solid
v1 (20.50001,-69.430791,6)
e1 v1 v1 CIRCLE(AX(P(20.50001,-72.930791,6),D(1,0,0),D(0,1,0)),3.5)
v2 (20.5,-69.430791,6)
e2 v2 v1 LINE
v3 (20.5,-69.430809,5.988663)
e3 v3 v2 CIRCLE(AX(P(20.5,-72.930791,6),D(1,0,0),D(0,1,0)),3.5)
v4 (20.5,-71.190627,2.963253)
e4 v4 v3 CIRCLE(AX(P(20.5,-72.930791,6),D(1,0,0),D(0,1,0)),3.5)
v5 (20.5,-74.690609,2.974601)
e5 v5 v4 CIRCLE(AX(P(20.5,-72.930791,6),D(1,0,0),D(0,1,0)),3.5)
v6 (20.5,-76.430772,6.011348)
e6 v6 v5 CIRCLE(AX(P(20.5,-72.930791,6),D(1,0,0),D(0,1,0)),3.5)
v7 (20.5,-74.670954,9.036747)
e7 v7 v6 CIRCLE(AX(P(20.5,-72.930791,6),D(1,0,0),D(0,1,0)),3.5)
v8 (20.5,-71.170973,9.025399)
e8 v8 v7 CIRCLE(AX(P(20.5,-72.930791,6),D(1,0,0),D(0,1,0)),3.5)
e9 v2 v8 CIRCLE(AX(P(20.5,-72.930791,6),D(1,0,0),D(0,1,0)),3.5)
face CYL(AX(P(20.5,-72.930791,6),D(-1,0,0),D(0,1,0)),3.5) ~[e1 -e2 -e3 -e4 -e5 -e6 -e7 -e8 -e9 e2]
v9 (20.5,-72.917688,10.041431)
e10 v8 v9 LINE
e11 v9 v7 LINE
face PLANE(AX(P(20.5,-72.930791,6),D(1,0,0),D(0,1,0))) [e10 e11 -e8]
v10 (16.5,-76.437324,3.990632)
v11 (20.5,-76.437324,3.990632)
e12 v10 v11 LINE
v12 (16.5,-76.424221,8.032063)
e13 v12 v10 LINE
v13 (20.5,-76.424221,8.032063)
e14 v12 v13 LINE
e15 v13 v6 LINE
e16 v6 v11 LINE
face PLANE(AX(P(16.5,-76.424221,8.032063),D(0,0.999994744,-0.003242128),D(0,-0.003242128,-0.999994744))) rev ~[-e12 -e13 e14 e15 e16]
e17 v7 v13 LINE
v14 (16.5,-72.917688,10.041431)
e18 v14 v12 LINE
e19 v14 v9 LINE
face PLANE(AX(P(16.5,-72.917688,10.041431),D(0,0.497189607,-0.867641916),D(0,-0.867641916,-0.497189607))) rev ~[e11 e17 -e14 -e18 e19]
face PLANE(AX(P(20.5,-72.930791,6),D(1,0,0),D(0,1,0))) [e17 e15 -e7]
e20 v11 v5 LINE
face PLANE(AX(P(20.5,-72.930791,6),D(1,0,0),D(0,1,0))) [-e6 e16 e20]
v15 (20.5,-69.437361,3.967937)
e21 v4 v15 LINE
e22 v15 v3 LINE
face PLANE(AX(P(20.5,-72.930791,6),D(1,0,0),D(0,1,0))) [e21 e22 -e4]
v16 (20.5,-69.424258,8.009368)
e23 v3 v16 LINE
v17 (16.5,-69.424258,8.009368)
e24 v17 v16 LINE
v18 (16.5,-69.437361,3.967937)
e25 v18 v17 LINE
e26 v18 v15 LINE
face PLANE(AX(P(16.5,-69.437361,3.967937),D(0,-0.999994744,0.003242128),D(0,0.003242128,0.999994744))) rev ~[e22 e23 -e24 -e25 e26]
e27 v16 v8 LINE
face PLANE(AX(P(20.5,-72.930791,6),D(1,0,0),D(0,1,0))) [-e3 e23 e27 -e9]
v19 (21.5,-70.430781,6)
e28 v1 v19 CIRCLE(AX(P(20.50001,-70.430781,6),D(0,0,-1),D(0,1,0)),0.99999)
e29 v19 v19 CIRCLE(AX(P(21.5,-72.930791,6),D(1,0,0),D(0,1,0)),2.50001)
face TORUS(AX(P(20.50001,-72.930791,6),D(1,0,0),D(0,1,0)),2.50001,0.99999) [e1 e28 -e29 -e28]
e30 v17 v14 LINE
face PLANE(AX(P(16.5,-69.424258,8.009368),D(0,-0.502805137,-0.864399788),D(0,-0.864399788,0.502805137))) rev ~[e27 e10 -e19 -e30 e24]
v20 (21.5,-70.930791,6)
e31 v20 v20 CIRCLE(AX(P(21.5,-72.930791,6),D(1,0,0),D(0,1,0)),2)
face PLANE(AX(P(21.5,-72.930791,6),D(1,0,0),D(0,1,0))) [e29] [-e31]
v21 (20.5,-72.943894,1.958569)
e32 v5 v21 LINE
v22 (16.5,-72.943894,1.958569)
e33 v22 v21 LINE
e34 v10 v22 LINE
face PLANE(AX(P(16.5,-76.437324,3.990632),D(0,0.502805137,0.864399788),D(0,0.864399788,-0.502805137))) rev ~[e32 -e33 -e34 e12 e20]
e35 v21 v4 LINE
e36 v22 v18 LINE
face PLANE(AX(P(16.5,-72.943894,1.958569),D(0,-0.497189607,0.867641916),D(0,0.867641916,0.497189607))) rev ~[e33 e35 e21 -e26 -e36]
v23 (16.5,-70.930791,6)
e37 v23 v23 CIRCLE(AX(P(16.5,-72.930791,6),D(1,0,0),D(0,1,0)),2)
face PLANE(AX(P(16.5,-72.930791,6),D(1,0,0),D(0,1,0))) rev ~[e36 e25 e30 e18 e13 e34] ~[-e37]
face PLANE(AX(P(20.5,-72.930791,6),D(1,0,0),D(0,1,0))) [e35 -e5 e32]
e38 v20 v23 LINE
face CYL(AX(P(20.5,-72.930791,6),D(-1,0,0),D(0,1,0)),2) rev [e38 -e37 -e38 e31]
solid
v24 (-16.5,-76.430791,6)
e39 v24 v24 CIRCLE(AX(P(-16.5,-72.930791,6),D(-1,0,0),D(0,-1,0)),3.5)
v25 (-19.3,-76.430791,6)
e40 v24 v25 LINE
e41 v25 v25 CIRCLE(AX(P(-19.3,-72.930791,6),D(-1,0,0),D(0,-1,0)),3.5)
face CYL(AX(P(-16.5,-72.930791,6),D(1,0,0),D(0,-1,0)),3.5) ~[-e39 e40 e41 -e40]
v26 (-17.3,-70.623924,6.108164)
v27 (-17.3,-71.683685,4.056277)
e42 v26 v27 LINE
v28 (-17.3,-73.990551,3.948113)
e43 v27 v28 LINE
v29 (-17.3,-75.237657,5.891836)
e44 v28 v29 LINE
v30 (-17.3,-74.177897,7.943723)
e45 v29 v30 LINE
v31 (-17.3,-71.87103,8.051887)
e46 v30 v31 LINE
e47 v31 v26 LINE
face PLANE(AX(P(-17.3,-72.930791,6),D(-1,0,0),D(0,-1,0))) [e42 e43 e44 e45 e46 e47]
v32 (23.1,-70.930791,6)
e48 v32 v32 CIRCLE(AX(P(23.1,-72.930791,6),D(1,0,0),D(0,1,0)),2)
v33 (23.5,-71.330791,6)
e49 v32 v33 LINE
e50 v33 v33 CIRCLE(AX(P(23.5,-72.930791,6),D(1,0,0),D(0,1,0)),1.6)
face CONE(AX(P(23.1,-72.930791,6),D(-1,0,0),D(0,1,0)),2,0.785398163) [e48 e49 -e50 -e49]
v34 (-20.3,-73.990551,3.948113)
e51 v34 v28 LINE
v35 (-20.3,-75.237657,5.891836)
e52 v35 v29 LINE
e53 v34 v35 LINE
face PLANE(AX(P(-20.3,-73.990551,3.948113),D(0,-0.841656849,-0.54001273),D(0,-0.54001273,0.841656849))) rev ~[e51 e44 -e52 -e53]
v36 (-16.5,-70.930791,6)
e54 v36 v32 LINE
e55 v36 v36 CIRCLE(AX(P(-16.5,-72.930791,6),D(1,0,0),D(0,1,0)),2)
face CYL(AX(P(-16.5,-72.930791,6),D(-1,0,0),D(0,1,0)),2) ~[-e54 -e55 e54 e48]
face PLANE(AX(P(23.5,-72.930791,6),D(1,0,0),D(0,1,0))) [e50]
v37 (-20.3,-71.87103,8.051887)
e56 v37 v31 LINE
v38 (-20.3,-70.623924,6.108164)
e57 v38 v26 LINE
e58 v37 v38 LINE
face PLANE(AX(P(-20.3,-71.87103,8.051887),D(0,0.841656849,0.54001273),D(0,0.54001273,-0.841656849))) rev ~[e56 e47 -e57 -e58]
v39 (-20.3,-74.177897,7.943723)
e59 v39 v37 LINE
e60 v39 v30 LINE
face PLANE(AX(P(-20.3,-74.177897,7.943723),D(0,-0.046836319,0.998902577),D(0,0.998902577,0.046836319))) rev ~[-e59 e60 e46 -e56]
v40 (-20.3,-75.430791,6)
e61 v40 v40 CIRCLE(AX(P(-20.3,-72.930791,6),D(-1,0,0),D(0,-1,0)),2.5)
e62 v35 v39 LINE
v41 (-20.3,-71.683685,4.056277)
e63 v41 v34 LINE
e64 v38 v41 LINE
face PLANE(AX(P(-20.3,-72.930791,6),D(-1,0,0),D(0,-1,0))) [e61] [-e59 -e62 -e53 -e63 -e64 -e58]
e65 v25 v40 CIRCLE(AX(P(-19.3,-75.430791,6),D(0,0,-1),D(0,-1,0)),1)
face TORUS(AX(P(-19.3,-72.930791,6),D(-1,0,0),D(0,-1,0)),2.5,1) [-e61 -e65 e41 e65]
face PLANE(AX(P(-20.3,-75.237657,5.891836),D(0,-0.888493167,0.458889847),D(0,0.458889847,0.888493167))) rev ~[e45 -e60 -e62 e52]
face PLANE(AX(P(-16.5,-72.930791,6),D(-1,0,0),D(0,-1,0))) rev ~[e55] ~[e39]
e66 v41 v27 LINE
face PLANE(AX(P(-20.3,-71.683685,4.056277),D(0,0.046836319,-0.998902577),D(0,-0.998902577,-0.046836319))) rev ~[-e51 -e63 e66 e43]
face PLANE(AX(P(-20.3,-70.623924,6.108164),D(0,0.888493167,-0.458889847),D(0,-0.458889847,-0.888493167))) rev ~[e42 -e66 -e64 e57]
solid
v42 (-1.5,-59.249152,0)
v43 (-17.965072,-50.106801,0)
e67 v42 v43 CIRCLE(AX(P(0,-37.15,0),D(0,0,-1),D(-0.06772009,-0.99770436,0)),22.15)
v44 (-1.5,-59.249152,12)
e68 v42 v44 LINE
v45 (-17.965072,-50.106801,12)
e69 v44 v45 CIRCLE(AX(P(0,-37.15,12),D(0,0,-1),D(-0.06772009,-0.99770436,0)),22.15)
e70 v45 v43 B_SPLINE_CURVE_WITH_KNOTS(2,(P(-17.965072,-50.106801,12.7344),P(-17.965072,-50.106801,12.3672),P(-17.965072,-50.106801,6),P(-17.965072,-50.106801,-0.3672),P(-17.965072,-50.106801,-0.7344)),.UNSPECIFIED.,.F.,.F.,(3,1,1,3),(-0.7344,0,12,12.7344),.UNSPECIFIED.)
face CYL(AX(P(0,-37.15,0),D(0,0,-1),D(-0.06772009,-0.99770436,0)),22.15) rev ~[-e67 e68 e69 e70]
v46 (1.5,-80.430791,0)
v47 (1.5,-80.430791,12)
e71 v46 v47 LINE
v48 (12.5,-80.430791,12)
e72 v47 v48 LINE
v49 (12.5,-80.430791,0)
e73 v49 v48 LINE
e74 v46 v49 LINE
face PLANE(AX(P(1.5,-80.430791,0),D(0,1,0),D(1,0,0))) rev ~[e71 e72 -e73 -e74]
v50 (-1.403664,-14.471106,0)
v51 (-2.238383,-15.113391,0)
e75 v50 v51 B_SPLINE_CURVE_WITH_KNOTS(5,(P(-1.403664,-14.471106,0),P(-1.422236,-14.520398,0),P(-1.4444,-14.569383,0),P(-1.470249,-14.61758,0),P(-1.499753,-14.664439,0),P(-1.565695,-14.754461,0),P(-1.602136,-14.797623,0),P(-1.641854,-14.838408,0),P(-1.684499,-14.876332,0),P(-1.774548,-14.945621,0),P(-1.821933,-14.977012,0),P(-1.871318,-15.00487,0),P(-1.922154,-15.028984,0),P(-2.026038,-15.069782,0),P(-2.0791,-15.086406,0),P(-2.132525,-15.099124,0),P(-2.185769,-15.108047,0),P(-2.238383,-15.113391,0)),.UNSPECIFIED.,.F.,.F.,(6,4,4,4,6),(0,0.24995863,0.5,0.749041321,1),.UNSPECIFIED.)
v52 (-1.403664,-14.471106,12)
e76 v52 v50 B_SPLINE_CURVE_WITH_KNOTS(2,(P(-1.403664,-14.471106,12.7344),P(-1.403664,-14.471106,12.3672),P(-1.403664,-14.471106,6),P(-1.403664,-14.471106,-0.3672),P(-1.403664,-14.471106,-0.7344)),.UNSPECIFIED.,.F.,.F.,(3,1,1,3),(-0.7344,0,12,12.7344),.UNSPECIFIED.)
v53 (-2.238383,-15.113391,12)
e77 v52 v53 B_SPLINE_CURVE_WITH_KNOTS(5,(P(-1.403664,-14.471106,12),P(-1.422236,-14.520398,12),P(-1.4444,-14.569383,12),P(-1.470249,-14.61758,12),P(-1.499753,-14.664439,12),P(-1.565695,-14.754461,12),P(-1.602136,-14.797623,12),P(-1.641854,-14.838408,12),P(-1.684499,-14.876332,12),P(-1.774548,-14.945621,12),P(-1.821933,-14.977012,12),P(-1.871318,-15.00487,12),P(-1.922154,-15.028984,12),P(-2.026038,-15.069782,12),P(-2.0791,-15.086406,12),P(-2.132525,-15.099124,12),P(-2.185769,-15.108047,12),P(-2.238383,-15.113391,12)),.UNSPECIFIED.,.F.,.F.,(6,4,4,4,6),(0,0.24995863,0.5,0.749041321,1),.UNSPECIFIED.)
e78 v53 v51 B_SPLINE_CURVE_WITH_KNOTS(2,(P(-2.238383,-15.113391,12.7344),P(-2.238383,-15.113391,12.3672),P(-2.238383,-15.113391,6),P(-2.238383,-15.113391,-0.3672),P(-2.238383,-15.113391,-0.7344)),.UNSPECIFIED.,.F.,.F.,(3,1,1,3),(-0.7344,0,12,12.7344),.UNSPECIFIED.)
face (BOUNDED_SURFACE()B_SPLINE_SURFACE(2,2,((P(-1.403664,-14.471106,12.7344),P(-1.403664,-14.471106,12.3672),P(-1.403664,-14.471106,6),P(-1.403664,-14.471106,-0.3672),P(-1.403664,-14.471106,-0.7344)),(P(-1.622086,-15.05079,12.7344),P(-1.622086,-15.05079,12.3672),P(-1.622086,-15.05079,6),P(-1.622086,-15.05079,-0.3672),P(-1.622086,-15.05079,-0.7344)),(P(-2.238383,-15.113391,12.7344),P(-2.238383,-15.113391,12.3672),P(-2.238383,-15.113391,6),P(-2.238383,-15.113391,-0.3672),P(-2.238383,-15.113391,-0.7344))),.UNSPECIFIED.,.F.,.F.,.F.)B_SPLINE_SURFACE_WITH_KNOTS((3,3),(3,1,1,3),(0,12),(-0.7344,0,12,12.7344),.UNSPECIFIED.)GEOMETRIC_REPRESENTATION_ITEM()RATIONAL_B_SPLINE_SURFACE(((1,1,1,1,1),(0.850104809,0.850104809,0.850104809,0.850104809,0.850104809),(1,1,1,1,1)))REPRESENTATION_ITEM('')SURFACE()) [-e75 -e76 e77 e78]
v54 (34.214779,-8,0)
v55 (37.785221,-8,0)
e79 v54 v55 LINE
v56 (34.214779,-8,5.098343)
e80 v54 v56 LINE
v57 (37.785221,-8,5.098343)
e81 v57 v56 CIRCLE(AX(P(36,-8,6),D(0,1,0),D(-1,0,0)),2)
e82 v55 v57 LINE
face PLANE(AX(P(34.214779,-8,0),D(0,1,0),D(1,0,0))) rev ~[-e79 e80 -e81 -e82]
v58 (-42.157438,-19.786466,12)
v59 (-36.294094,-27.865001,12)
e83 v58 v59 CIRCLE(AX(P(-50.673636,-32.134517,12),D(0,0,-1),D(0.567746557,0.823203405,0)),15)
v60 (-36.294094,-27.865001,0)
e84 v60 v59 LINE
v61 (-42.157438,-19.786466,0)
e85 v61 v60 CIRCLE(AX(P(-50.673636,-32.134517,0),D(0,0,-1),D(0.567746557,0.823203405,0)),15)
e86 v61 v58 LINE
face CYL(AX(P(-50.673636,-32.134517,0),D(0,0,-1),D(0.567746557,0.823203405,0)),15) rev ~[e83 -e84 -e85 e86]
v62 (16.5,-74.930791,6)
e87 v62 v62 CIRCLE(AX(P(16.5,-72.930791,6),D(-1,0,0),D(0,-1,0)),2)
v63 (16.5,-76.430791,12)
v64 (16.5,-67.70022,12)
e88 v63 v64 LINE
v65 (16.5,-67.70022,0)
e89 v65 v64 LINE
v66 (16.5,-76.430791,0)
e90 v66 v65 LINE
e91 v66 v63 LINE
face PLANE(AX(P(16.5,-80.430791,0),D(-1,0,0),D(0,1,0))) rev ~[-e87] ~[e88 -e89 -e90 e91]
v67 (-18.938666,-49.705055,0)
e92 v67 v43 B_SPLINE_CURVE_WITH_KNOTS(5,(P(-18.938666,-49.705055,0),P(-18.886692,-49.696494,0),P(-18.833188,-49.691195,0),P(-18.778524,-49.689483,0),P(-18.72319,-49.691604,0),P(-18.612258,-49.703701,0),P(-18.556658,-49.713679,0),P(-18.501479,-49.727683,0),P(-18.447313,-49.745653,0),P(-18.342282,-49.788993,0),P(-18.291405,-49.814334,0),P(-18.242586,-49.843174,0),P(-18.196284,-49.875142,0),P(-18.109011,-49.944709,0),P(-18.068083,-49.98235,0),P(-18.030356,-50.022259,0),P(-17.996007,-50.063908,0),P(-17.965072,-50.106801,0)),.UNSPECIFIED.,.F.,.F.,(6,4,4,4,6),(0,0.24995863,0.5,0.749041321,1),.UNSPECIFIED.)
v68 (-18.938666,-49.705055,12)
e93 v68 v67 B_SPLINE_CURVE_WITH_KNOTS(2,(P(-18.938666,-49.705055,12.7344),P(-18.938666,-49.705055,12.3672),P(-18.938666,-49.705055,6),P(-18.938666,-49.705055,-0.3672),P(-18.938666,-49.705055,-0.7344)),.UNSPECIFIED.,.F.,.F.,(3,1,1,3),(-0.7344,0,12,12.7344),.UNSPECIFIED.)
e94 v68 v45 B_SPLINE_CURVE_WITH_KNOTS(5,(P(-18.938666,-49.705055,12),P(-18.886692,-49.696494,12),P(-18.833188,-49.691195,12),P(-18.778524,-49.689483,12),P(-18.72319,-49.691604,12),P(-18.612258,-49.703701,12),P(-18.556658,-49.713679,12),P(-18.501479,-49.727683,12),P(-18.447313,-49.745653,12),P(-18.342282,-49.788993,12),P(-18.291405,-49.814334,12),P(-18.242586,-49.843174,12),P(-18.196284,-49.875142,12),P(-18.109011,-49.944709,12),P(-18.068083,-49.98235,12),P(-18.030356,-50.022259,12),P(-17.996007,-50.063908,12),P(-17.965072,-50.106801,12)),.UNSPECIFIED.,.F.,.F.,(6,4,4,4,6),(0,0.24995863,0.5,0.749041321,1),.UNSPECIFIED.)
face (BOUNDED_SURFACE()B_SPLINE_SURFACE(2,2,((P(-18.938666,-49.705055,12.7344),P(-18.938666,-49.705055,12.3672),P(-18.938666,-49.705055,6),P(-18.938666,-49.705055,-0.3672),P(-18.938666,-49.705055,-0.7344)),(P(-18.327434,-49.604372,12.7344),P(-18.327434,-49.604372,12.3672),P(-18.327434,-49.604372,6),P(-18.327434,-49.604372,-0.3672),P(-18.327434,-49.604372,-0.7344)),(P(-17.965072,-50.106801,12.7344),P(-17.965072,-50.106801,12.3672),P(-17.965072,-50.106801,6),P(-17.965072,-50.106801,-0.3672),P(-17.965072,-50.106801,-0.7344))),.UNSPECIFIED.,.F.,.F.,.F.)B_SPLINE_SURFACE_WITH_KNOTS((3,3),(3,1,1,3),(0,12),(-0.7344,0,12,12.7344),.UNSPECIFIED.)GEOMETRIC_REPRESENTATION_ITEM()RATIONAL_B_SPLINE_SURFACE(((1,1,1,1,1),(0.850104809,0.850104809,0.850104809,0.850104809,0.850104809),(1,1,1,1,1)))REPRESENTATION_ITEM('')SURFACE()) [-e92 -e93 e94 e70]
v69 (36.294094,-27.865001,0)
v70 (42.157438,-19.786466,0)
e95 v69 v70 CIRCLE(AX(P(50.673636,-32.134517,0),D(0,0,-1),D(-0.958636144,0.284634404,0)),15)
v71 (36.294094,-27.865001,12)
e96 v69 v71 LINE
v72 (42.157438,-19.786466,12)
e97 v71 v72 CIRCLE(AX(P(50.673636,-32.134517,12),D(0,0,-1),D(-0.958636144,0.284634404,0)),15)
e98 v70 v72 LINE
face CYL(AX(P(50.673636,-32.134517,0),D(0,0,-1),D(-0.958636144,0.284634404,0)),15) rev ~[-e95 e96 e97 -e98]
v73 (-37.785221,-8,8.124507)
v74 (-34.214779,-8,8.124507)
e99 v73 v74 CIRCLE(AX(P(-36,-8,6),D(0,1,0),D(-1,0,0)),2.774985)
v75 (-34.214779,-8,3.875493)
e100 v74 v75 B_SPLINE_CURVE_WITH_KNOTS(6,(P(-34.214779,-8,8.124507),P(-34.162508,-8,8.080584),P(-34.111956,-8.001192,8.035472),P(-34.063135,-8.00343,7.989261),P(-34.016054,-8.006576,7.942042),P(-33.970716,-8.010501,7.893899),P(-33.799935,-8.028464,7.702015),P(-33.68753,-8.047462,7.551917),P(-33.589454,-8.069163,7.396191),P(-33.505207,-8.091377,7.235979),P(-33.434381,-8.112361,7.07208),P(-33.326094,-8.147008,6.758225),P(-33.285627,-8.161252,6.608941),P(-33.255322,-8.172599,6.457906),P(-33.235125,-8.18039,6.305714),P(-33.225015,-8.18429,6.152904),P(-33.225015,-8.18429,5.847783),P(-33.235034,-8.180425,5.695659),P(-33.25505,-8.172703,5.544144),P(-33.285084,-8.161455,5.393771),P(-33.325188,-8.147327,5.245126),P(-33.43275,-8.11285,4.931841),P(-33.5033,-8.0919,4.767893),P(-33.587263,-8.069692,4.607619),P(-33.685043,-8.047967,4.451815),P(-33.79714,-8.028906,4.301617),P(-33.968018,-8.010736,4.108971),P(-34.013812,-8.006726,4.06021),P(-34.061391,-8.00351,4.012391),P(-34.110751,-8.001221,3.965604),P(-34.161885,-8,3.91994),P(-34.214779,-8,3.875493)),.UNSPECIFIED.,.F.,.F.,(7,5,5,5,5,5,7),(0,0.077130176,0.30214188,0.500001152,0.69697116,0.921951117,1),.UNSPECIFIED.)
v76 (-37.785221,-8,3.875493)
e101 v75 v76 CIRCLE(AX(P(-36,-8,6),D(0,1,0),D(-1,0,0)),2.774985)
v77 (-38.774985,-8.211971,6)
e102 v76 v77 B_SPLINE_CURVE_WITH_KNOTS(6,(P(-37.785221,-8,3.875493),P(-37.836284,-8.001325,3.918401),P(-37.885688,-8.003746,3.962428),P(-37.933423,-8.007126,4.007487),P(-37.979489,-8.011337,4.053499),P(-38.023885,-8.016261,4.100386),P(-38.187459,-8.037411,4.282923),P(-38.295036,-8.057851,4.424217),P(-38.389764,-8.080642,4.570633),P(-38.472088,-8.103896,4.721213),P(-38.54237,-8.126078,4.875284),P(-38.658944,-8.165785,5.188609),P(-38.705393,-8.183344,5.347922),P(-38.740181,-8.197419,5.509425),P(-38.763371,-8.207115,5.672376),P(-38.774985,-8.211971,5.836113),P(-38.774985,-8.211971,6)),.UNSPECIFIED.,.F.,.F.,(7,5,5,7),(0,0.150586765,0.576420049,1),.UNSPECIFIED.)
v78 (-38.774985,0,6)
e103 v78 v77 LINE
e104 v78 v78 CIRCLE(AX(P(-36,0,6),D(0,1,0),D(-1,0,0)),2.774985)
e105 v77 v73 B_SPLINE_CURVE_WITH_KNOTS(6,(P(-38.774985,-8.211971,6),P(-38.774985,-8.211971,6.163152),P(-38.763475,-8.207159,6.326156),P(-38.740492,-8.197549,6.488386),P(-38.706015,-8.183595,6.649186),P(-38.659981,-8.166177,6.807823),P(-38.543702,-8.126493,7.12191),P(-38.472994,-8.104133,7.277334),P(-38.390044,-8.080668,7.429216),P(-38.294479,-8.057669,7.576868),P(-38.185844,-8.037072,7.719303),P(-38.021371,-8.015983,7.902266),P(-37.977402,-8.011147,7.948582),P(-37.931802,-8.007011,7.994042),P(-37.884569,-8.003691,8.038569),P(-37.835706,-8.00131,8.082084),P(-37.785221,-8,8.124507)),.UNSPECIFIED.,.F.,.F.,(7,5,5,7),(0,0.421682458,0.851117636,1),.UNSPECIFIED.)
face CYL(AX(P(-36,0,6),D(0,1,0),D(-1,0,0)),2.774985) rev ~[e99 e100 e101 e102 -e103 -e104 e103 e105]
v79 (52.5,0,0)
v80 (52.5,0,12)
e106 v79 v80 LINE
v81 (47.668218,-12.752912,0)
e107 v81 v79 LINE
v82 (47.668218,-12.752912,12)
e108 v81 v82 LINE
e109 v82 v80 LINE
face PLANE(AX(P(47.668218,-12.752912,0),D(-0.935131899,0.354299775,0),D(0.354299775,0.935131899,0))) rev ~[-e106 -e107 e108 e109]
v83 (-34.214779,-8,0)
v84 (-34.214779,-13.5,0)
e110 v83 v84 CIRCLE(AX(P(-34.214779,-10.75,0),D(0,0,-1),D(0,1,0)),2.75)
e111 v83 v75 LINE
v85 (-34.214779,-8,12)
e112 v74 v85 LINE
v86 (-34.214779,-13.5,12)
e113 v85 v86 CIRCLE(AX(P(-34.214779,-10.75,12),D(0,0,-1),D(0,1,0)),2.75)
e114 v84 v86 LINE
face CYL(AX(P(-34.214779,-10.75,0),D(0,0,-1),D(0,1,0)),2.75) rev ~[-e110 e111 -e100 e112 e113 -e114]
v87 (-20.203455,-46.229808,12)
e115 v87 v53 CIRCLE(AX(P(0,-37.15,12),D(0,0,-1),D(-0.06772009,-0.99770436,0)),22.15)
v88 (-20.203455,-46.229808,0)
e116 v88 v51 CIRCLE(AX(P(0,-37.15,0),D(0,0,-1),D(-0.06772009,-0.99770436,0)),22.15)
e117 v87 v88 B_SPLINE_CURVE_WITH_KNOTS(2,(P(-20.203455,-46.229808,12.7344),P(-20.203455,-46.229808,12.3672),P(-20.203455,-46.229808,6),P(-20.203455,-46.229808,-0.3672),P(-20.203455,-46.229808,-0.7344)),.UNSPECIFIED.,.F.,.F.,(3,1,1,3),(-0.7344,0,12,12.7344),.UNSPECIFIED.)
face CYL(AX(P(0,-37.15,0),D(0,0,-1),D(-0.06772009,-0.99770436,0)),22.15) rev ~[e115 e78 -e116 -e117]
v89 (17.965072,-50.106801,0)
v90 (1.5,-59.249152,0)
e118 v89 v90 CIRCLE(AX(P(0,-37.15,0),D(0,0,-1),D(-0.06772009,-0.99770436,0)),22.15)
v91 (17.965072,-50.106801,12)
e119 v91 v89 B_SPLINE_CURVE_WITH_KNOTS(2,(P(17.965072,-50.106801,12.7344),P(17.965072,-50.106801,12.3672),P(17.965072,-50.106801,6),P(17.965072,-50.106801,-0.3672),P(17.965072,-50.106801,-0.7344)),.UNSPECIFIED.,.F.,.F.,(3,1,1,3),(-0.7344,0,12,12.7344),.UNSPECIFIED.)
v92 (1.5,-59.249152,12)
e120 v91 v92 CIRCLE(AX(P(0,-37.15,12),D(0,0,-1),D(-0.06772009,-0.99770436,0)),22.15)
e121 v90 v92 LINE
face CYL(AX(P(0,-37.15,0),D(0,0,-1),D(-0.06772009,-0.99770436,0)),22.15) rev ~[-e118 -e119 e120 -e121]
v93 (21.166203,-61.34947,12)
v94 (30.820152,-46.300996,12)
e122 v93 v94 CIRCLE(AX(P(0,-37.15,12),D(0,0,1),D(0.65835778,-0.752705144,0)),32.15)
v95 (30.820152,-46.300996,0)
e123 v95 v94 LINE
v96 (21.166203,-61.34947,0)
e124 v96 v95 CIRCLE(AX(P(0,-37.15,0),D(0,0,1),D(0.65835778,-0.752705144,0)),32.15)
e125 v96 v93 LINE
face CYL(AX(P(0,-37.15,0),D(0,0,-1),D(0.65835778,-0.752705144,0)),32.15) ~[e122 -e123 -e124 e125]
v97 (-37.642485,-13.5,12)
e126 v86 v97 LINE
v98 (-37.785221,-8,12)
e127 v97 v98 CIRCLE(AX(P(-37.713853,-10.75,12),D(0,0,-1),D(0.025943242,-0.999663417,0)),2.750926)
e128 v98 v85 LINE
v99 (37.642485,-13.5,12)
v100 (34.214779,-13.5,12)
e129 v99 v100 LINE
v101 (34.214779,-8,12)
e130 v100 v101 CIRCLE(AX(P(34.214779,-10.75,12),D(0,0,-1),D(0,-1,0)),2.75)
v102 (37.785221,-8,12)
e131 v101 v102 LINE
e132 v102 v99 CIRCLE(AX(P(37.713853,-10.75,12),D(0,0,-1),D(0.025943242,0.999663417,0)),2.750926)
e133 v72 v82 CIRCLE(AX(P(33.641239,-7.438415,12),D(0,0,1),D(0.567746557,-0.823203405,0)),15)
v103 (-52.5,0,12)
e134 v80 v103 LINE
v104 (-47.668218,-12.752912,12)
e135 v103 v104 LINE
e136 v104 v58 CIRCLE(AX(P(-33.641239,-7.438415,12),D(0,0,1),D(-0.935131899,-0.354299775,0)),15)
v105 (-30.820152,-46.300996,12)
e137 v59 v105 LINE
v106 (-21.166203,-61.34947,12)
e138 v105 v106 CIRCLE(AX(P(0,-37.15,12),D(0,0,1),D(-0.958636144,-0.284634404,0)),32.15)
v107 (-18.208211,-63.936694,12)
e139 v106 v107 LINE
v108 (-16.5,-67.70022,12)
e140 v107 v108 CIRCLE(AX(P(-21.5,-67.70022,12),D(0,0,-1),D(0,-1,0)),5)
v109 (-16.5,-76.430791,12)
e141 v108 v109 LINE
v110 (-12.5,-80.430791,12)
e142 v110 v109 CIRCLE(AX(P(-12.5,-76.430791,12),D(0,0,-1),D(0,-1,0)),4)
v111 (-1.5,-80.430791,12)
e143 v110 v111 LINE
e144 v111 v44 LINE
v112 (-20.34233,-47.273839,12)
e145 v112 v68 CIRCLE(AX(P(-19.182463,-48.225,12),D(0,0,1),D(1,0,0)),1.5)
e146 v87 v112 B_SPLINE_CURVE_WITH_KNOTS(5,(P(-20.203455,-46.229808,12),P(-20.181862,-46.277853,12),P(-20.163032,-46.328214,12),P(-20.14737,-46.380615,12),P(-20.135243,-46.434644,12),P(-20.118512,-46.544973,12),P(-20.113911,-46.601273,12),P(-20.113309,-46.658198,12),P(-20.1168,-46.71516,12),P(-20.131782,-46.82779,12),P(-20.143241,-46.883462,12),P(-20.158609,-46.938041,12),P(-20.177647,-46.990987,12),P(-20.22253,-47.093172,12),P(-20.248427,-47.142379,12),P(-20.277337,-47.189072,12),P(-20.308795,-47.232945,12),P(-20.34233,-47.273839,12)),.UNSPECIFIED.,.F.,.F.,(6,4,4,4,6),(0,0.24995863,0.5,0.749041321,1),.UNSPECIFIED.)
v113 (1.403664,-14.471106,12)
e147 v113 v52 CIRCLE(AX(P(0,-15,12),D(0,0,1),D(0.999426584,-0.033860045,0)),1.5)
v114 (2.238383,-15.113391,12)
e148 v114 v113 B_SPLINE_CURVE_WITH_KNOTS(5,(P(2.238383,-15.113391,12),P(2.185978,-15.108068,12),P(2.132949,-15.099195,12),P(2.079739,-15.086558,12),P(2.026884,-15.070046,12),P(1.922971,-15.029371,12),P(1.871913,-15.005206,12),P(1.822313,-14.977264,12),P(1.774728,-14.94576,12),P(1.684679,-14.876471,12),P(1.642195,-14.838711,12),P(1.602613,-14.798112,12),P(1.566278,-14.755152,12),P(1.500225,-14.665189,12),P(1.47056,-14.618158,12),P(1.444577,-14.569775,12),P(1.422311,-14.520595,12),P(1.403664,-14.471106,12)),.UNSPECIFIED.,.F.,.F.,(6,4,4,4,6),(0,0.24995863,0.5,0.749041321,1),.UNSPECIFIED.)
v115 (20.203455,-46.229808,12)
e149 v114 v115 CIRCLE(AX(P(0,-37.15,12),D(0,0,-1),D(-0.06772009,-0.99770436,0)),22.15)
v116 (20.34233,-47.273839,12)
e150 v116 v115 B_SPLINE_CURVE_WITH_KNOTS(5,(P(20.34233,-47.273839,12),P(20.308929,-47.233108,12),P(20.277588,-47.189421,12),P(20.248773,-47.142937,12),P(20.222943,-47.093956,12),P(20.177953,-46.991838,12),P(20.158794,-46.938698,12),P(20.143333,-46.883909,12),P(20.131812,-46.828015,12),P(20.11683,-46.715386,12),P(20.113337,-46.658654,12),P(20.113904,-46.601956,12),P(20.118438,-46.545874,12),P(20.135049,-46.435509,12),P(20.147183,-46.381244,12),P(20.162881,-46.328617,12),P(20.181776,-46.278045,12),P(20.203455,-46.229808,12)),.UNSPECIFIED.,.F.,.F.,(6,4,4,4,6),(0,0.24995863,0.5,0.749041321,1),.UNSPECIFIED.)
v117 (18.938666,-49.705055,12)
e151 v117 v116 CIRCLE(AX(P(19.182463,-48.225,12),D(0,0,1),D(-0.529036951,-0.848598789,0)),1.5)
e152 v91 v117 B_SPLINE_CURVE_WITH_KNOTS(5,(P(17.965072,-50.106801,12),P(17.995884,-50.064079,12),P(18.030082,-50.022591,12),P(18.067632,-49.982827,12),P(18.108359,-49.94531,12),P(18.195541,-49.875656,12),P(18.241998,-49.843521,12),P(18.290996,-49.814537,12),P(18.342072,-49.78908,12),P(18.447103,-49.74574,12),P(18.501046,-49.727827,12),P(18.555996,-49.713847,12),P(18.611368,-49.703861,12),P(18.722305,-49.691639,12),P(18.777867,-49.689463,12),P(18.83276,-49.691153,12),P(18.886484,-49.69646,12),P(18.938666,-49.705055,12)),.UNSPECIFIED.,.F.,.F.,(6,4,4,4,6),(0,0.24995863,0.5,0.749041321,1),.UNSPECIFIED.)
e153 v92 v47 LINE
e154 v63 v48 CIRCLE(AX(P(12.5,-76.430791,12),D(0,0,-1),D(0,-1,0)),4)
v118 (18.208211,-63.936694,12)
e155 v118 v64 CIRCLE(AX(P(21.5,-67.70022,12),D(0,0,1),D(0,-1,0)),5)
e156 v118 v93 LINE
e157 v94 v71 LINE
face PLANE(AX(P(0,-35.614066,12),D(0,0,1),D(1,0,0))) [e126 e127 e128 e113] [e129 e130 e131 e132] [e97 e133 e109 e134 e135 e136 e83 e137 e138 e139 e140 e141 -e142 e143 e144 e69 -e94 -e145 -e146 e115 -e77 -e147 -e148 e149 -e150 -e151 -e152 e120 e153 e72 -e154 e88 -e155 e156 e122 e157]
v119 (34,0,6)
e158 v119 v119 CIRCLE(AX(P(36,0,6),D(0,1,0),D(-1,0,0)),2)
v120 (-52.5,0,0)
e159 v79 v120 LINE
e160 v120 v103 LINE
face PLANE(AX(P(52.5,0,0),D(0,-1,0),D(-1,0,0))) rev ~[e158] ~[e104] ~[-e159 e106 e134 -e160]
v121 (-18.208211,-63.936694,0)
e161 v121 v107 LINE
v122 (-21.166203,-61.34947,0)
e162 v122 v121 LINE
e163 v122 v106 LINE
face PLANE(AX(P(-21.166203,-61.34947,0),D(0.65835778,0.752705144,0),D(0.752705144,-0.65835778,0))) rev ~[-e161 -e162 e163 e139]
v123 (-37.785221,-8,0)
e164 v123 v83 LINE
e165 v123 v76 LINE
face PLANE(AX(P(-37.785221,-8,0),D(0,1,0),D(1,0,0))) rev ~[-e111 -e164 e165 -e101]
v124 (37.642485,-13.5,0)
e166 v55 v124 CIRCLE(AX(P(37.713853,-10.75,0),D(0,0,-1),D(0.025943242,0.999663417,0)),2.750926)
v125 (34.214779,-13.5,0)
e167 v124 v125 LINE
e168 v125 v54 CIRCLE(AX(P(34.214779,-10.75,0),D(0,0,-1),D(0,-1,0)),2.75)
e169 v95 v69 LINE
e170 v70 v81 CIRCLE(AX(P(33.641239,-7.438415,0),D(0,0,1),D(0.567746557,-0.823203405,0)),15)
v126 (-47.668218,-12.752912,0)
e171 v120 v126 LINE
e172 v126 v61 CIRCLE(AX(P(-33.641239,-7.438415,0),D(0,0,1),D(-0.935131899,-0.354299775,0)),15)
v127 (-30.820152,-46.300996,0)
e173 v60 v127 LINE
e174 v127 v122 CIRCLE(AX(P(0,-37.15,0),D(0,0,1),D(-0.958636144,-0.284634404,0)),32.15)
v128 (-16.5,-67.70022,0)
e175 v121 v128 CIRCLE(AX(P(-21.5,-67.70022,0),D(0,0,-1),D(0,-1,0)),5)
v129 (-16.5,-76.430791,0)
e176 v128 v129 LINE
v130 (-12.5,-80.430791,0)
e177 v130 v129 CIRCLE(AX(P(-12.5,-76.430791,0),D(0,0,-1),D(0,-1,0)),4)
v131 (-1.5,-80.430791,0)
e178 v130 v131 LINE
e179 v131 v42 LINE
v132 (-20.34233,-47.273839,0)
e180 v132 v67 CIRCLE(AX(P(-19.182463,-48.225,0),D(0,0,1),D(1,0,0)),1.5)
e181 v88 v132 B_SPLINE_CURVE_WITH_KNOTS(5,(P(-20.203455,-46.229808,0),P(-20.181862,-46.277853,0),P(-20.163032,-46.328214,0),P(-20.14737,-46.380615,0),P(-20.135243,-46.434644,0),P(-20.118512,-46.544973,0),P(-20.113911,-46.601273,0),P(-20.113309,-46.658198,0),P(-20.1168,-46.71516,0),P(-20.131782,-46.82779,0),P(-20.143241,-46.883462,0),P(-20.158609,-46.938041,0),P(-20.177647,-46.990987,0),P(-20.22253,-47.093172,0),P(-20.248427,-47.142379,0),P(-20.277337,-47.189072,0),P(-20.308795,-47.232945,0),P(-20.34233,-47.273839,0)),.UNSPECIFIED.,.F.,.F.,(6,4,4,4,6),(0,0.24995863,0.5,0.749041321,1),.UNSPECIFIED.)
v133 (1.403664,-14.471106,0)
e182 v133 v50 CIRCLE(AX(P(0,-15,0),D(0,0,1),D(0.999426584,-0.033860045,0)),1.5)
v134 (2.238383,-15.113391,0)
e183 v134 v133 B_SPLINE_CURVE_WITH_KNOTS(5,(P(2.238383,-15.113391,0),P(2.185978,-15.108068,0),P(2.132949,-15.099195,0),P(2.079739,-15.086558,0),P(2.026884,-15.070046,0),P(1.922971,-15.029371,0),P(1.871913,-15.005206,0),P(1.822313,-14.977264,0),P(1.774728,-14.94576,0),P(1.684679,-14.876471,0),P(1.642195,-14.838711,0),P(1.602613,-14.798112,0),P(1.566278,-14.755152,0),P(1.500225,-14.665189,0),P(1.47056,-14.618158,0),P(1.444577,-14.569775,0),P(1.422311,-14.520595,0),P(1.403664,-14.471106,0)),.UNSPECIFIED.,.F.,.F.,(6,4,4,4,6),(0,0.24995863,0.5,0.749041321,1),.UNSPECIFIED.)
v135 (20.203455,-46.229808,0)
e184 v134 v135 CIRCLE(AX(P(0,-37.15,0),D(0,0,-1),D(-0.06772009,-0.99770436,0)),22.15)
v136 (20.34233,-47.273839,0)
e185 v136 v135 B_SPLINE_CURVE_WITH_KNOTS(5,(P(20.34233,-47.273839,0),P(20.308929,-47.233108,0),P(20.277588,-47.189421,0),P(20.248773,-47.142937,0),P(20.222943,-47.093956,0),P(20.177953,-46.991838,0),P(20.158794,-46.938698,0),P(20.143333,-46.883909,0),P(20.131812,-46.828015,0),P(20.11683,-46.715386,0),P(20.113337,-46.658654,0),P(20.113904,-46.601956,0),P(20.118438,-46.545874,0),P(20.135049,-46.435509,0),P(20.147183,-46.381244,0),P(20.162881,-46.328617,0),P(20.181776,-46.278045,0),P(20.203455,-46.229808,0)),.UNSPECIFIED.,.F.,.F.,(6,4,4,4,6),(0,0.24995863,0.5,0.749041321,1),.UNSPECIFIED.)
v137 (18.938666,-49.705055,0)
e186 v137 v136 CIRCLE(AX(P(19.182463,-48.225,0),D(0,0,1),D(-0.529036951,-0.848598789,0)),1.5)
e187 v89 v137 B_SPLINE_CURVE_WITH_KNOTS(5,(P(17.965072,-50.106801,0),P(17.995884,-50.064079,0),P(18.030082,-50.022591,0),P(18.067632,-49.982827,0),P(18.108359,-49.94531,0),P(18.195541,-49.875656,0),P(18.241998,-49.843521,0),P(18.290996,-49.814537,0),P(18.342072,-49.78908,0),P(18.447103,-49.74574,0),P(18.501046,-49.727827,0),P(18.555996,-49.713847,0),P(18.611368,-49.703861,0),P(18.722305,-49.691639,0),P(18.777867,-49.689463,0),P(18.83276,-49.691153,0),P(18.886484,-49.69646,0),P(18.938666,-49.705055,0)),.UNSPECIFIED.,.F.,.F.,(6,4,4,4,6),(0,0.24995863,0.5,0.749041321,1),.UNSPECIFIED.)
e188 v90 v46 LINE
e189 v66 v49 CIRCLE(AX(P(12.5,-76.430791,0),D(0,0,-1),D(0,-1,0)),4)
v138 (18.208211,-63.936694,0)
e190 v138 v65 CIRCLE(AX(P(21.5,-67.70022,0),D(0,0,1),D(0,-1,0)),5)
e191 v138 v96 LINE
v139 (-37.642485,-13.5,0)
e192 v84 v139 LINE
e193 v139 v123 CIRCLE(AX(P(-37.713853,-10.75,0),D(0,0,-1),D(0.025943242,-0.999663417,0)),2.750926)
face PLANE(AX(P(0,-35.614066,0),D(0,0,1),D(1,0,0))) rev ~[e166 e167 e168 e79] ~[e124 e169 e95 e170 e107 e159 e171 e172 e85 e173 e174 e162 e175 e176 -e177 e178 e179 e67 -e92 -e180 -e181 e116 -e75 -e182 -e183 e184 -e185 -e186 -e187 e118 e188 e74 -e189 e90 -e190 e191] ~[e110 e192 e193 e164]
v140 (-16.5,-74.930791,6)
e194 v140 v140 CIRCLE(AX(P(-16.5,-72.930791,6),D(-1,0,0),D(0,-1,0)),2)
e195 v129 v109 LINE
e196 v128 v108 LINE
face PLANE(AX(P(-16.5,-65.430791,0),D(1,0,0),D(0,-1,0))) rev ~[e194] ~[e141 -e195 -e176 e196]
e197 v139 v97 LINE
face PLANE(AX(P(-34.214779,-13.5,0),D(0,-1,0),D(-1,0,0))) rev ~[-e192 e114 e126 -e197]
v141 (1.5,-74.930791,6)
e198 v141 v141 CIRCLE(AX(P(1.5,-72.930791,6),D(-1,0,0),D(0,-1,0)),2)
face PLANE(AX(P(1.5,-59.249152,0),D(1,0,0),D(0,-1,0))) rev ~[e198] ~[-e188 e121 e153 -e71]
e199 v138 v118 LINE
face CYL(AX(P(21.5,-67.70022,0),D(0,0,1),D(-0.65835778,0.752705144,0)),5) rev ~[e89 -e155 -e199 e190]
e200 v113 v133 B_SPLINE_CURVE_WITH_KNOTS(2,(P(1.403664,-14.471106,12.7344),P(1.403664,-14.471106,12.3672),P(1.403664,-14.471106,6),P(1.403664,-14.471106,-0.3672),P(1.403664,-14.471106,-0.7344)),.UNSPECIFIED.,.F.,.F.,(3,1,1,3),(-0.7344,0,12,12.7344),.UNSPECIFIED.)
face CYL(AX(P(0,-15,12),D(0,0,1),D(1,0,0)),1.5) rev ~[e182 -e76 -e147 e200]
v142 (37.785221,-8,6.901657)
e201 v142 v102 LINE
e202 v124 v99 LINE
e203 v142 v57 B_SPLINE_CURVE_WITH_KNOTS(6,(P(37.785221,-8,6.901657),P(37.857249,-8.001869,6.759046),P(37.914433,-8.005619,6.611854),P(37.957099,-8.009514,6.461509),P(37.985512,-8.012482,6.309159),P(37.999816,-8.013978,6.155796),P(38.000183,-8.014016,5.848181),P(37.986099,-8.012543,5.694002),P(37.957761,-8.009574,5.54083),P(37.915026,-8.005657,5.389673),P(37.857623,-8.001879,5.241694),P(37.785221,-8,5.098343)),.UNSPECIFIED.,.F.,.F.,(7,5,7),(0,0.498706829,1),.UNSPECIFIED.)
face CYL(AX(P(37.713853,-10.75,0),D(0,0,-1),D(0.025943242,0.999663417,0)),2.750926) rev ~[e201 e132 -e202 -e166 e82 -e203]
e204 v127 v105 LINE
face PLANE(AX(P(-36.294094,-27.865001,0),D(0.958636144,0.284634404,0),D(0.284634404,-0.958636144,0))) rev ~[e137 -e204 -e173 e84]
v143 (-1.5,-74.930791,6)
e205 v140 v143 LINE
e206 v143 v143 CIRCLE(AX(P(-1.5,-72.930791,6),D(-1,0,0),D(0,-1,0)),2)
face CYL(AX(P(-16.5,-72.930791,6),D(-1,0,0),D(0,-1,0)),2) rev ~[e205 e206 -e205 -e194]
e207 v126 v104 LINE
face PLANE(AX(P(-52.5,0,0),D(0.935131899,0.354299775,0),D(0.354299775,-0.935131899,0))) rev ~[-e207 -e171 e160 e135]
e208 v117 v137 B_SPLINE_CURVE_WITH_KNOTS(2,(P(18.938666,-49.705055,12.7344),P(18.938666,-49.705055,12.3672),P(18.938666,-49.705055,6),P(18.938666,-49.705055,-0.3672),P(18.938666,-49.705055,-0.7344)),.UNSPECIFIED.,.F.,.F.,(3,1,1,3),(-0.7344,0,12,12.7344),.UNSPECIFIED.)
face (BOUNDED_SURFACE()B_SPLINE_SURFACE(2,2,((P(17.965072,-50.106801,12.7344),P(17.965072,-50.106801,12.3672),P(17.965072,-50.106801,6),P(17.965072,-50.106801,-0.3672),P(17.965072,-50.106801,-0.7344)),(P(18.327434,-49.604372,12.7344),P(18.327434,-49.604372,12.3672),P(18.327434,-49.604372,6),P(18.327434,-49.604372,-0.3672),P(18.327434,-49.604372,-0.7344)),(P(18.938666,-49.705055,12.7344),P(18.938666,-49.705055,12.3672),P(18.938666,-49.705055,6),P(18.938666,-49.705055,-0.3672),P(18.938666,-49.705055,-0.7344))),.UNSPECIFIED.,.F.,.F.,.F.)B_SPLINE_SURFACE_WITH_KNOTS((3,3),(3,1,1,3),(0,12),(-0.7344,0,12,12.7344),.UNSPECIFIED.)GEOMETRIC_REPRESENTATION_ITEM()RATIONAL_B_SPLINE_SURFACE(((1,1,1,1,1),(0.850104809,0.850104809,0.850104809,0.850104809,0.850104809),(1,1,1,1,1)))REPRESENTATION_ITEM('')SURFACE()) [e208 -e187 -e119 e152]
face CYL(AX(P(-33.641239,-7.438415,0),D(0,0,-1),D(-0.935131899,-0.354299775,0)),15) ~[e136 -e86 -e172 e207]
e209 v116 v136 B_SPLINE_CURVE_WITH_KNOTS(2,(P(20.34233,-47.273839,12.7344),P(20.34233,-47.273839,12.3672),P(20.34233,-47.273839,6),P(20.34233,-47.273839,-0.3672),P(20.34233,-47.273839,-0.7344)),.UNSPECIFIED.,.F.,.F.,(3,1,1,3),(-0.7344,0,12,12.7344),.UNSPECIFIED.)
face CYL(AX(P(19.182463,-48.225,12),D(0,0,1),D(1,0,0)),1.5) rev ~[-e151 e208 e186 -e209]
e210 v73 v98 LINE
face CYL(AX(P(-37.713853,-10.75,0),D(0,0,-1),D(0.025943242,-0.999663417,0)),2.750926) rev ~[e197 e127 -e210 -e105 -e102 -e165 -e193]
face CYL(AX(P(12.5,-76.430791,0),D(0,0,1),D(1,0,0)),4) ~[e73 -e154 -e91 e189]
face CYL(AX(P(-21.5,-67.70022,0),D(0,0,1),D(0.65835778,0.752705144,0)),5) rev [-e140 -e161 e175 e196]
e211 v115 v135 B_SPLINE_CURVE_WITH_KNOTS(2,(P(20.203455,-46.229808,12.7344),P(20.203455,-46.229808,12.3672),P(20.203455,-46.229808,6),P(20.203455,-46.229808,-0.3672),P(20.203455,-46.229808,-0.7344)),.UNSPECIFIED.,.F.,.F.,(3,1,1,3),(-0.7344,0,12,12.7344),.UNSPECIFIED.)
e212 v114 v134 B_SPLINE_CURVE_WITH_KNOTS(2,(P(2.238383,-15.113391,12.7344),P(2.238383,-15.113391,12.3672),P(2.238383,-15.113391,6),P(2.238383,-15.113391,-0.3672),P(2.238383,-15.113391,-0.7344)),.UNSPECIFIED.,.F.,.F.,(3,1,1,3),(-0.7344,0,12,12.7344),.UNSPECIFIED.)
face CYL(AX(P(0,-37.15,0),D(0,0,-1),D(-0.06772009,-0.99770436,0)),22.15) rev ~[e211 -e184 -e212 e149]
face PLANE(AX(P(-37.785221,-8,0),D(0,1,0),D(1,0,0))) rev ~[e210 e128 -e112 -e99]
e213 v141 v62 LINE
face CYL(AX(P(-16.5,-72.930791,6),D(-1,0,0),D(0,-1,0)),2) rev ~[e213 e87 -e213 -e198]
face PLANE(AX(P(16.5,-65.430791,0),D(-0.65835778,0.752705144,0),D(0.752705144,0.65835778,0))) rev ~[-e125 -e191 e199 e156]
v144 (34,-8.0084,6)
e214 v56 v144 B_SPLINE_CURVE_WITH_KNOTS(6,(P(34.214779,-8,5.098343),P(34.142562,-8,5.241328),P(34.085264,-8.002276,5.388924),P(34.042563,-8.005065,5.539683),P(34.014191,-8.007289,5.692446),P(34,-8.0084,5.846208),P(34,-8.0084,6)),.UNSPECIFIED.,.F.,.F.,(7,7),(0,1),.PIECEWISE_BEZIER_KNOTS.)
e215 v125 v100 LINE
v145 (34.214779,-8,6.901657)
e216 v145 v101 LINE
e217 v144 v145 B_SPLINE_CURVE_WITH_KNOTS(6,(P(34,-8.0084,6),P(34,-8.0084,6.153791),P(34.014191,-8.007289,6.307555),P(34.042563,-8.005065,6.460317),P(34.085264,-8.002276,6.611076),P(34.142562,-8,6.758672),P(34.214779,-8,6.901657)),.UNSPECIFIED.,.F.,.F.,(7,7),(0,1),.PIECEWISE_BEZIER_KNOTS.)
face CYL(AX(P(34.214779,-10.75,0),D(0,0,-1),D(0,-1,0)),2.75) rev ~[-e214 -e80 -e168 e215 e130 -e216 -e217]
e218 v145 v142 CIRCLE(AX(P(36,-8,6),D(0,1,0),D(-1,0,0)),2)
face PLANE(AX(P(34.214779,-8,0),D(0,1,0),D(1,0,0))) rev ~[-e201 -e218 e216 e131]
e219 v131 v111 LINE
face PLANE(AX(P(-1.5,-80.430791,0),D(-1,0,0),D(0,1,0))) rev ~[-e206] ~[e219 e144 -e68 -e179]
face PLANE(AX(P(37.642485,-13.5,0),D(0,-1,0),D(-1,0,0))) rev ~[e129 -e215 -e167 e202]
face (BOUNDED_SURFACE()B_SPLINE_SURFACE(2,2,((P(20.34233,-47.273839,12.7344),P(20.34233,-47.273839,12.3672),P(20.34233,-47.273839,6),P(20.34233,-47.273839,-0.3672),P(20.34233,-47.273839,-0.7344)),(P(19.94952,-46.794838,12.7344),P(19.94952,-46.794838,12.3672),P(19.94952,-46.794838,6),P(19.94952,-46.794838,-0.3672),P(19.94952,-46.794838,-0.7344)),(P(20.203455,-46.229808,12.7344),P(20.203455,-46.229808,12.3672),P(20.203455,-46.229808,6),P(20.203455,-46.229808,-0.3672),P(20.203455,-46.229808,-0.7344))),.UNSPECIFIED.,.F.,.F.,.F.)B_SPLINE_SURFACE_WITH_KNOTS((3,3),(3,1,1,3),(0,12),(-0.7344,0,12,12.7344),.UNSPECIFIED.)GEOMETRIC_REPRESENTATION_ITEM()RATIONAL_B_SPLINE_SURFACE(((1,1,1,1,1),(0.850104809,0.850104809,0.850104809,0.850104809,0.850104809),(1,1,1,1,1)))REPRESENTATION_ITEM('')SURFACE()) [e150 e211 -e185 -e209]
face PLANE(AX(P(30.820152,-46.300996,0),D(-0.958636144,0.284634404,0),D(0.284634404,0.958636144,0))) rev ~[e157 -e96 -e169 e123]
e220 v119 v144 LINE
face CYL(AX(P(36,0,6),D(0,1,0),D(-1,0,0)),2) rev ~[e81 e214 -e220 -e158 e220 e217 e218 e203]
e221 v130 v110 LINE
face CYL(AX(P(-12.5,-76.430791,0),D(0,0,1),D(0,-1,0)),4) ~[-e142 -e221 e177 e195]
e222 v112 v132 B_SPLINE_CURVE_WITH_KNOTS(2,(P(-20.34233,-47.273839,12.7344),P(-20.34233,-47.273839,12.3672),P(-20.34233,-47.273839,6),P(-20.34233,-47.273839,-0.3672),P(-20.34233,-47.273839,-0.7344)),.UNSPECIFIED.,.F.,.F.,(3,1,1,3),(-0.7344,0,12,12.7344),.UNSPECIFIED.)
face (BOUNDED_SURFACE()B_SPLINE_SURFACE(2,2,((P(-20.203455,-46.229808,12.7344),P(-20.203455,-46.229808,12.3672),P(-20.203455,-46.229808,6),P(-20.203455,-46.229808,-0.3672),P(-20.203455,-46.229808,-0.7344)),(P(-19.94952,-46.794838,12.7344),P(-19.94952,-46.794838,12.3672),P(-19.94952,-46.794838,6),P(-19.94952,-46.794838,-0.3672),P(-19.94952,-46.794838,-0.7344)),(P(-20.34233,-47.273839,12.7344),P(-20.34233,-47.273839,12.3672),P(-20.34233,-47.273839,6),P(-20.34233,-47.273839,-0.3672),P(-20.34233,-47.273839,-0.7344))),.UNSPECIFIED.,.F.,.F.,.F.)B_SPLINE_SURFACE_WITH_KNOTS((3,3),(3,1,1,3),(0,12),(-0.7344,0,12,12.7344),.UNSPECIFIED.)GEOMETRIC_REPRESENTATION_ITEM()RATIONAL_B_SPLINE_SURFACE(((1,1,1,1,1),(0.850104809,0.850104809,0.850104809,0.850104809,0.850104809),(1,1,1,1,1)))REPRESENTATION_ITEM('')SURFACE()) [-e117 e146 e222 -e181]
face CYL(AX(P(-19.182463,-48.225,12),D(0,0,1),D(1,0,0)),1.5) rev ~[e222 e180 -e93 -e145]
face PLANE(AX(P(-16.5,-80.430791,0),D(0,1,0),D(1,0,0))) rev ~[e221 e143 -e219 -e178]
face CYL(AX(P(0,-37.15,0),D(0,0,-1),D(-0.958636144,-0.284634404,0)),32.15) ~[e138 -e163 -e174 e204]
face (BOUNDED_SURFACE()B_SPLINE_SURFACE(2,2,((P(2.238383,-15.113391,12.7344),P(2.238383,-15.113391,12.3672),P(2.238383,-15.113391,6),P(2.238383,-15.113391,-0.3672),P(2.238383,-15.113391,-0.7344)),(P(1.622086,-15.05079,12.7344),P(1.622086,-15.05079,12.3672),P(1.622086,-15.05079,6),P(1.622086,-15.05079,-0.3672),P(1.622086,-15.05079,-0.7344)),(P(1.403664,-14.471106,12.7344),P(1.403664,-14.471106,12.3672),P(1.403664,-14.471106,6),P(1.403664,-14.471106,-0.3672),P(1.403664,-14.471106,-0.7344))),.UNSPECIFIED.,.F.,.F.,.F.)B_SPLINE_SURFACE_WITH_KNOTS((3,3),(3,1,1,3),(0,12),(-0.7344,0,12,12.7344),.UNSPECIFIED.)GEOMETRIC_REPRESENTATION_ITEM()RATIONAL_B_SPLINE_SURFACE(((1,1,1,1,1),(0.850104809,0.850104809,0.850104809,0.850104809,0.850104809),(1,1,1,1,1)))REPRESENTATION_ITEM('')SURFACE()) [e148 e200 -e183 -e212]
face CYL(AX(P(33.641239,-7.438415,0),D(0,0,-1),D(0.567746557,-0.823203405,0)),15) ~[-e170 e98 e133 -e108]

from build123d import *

# Parameters (mm, degrees)
F1_DEPTH  = 12
F2_R      = 5
F3_R      = 2
F4_DEPTH  = 69.001
F5_R      = 4
F6_R      = 3.5
F7_DEPTH  = 3.8
F8_R      = 2
F9_DEPTH  = 40
F10_R     = 2
F11_DEPTH = 4
F12_R     = 3.5
F12_R_2   = 2
F13_DEPTH = 1
F14_R     = 0.99999
F15_SIZE  = 0.4
F17_DEPTH = 3
F18_R     = 1
F19_R     = 2
F19_R_2   = 2.7749854476
F20_DEPTH = 12
F21_R     = 1.5
F22_DEPTH = 25
F23_R     = 1


# Not quite as in the source:
# - a fillet or chamfer is up to 0.001 mm smaller than in the source, because OpenCascade refuses the exact size


with BuildPart() as f1:
    # F0 (on Top) → F1 (new body)
    with BuildSketch(Plane.XY):
        with BuildLine():
            Line((52.5, 0), (-52.5, 0))
            Line((-52.5, 0), (-47.6682177495, -12.7529115916))
            ThreePointArc((-47.6682177495, -12.7529115916), (-45.4487126417, -16.689553935), (-42.1574376197, -19.7864660409))
            ThreePointArc((-42.1574376197, -19.7864660409), (-38.5340554499, -23.3236951077), (-36.2940938248, -27.8650010584))
            Line((-36.2940938248, -27.8650010584), (-30.8201520188, -46.3009960956))
            ThreePointArc((-30.8201520188, -46.3009960956), (-27.0602921577, -54.5098124511), (-21.1662026167, -61.3494703824))
            Line((-21.1662026167, -61.3494703824), (-16.5, -65.4307906954))
            Line((-16.5, -65.4307906954), (-16.5, -80.4307906954))
            Line((-16.5, -80.4307906954), (-1.5, -80.4307906954))
            Line((-1.5, -80.4307906954), (-1.5, -59.2491515674))
            ThreePointArc((-1.5, -59.2491515674), (0, -15), (1.5, -59.2491515674))
            Line((1.5, -59.2491515674), (1.5, -80.4307906954))
            Line((1.5, -80.4307906954), (16.5, -80.4307906954))
            Line((16.5, -80.4307906954), (16.5, -65.4307906954))
            Line((16.5, -65.4307906954), (21.1662026167, -61.3494703824))
            ThreePointArc((21.1662026167, -61.3494703824), (27.0602921577, -54.5098124511), (30.8201520188, -46.3009960956))
            Line((30.8201520188, -46.3009960956), (36.2940938248, -27.8650010584))
            ThreePointArc((36.2940938248, -27.8650010584), (38.5340554499, -23.3236951077), (42.1574376197, -19.7864660409))
            ThreePointArc((42.1574376197, -19.7864660409), (45.4487126417, -16.689553935), (47.6682177495, -12.7529115916))
            Line((47.6682177495, -12.7529115916), (52.5, 0))
        make_face()
        with BuildLine():
            Line((-34.2147789885, -13.5), (-37.6424851382, -13.5))
            ThreePointArc((-37.6424851382, -13.5), (-40.4638530749, -10.8213679366), (-37.7852210115, -8))
            Line((-37.7852210115, -8), (-34.2147789885, -8))
            ThreePointArc((-34.2147789885, -8), (-31.4647789885, -10.75), (-34.2147789885, -13.5))
        make_face(mode=Mode.SUBTRACT)
        with BuildLine():
            ThreePointArc((37.7852210115, -8), (40.4638530749, -10.8213679366), (37.6424851382, -13.5))
            Line((37.6424851382, -13.5), (34.2147789885, -13.5))
            ThreePointArc((34.2147789885, -13.5), (31.4647789885, -10.75), (34.2147789885, -8))
            Line((34.2147789885, -8), (37.7852210115, -8))
        make_face(mode=Mode.SUBTRACT)
    extrude(amount=F1_DEPTH)

    # F2
    f2_edges = [f1.edges().sort_by_distance(p)[0] for p in [
        (-16.5, -65.430791, 6),
        (16.5, -65.430791, 6),
    ]]
    fillet(f2_edges, radius=F2_R)

    # F3 (on face) → F4 (cut, through all)
    with BuildSketch(Plane(origin=(-16.5, 0, 0), x_dir=(0, -1, 0), z_dir=(-1, 0, 0))):
        with Locations((72.9307906954, 6)):
            Circle(F3_R)
    extrude(amount=-F4_DEPTH, mode=Mode.SUBTRACT)

    # F5
    f5_edges = [f1.edges().sort_by_distance(p)[0] for p in [
        (-16.5, -80.430791, 6),
        (16.5, -80.430791, 6),
    ]]
    fillet(f5_edges, radius=F5_R)

    # F19 (on face) → F20 (cut)
    with BuildSketch(Plane(origin=(0, 0, 0), x_dir=(-1, 0, 0), z_dir=(0, 1, 0))):
        with Locations((-36, 6)):
            Circle(F19_R)
        with Locations((36, 6)):
            Circle(F19_R_2)
    extrude(amount=-F20_DEPTH, mode=Mode.SUBTRACT)

    # F21 (on face) → F22 (cut)
    with BuildSketch(Plane.XY.offset(12)):
        with Locations((0, -15)):
            Circle(F21_R)
        with Locations((-19.1824626938, -48.225)):
            Circle(F21_R)
        with Locations((19.1824626938, -48.225)):
            Circle(F21_R)
    extrude(amount=-F22_DEPTH, mode=Mode.SUBTRACT)

    # F23
    f23_edges = [f1.edges().sort_by_distance(p)[0] for p in [
        (1.49914, -15.05079, 6),
        (-1.49914, -15.05079, 6),
        (-19.888047, -46.901312, 6),
        (-18.388907, -49.497898, 6),
        (18.388907, -49.497898, 6),
        (19.888047, -46.901312, 6),
    ]]
    fillet(f23_edges, radius=F23_R)


with BuildPart() as f7:
    # F6 (on face) → F7 (new body)
    with BuildSketch(Plane(origin=(-16.5, 0, 0), x_dir=(0, -1, 0), z_dir=(-1, 0, 0))):
        with Locations((72.9307906954, 6)):
            Circle(F6_R)
    extrude(amount=F7_DEPTH)

    # F8 (on face) → F9 (join)
    with BuildSketch(Plane.YZ.offset(-16.5)):
        with Locations((-72.9307906954, 6)):
            Circle(F8_R)
    extrude(amount=F9_DEPTH)

    # F15
    f15_edges = [f7.edges().sort_by_distance(p)[0] for p in [
        (23.5, -74.930791, 6),
    ]]
    chamfer(f15_edges, length=F15_SIZE)

    # F16 (on face) → F17 (cut)
    with BuildSketch(Plane(origin=(-20.3, 0, 0), x_dir=(0, -1, 0), z_dir=(-1, 0, 0))):
        Polygon((73.9905514021, 3.9481129227), (75.2376573834, 5.8918361553), (74.1778966767, 7.9437232326), (71.8710299887, 8.0518870773), (70.6239240075, 6.1081638447), (71.6836847142, 4.0562767674), align=None)
    extrude(amount=-F17_DEPTH, mode=Mode.SUBTRACT)

    # F18
    f18_edges = [f7.edges().sort_by_distance(p)[0] for p in [
        (-20.3, -69.430791, 6),
    ]]
    fillet(f18_edges, radius=F18_R)


with BuildPart() as f11:
    # F10 (on face) → F11 (new body)
    with BuildSketch(Plane.YZ.offset(16.5)):
        Polygon((-76.4373237522, 3.9906321255), (-72.9438935989, 1.9585693564), (-69.4373605421, 3.9679372309), (-69.4242576387, 8.0093678745), (-72.9176877919, 10.0414306436), (-76.4242208487, 8.0320627691), align=None)
        with Locations((-72.9307906954, 6)):
            Circle(F10_R, mode=Mode.SUBTRACT)
    extrude(amount=F11_DEPTH)

    # F12 (on face) → F13 (join)
    with BuildSketch(Plane.YZ.offset(20.5)):
        with Locations((-72.9307906954, 6)):
            Circle(F12_R)
        with Locations((-72.9307906954, 6)):
            Circle(F12_R_2, mode=Mode.SUBTRACT)
    extrude(amount=F13_DEPTH)

    # F14 (radius 1 in the source; OpenCascade refuses exactly that, so slightly less here)
    f14_edges = [f11.edges().sort_by_distance(p)[0] for p in [
        (21.5, -76.430791, 6),
    ]]
    fillet(f14_edges, radius=F14_R)


solid = Compound([f1.part, f7.part, f11.part])
